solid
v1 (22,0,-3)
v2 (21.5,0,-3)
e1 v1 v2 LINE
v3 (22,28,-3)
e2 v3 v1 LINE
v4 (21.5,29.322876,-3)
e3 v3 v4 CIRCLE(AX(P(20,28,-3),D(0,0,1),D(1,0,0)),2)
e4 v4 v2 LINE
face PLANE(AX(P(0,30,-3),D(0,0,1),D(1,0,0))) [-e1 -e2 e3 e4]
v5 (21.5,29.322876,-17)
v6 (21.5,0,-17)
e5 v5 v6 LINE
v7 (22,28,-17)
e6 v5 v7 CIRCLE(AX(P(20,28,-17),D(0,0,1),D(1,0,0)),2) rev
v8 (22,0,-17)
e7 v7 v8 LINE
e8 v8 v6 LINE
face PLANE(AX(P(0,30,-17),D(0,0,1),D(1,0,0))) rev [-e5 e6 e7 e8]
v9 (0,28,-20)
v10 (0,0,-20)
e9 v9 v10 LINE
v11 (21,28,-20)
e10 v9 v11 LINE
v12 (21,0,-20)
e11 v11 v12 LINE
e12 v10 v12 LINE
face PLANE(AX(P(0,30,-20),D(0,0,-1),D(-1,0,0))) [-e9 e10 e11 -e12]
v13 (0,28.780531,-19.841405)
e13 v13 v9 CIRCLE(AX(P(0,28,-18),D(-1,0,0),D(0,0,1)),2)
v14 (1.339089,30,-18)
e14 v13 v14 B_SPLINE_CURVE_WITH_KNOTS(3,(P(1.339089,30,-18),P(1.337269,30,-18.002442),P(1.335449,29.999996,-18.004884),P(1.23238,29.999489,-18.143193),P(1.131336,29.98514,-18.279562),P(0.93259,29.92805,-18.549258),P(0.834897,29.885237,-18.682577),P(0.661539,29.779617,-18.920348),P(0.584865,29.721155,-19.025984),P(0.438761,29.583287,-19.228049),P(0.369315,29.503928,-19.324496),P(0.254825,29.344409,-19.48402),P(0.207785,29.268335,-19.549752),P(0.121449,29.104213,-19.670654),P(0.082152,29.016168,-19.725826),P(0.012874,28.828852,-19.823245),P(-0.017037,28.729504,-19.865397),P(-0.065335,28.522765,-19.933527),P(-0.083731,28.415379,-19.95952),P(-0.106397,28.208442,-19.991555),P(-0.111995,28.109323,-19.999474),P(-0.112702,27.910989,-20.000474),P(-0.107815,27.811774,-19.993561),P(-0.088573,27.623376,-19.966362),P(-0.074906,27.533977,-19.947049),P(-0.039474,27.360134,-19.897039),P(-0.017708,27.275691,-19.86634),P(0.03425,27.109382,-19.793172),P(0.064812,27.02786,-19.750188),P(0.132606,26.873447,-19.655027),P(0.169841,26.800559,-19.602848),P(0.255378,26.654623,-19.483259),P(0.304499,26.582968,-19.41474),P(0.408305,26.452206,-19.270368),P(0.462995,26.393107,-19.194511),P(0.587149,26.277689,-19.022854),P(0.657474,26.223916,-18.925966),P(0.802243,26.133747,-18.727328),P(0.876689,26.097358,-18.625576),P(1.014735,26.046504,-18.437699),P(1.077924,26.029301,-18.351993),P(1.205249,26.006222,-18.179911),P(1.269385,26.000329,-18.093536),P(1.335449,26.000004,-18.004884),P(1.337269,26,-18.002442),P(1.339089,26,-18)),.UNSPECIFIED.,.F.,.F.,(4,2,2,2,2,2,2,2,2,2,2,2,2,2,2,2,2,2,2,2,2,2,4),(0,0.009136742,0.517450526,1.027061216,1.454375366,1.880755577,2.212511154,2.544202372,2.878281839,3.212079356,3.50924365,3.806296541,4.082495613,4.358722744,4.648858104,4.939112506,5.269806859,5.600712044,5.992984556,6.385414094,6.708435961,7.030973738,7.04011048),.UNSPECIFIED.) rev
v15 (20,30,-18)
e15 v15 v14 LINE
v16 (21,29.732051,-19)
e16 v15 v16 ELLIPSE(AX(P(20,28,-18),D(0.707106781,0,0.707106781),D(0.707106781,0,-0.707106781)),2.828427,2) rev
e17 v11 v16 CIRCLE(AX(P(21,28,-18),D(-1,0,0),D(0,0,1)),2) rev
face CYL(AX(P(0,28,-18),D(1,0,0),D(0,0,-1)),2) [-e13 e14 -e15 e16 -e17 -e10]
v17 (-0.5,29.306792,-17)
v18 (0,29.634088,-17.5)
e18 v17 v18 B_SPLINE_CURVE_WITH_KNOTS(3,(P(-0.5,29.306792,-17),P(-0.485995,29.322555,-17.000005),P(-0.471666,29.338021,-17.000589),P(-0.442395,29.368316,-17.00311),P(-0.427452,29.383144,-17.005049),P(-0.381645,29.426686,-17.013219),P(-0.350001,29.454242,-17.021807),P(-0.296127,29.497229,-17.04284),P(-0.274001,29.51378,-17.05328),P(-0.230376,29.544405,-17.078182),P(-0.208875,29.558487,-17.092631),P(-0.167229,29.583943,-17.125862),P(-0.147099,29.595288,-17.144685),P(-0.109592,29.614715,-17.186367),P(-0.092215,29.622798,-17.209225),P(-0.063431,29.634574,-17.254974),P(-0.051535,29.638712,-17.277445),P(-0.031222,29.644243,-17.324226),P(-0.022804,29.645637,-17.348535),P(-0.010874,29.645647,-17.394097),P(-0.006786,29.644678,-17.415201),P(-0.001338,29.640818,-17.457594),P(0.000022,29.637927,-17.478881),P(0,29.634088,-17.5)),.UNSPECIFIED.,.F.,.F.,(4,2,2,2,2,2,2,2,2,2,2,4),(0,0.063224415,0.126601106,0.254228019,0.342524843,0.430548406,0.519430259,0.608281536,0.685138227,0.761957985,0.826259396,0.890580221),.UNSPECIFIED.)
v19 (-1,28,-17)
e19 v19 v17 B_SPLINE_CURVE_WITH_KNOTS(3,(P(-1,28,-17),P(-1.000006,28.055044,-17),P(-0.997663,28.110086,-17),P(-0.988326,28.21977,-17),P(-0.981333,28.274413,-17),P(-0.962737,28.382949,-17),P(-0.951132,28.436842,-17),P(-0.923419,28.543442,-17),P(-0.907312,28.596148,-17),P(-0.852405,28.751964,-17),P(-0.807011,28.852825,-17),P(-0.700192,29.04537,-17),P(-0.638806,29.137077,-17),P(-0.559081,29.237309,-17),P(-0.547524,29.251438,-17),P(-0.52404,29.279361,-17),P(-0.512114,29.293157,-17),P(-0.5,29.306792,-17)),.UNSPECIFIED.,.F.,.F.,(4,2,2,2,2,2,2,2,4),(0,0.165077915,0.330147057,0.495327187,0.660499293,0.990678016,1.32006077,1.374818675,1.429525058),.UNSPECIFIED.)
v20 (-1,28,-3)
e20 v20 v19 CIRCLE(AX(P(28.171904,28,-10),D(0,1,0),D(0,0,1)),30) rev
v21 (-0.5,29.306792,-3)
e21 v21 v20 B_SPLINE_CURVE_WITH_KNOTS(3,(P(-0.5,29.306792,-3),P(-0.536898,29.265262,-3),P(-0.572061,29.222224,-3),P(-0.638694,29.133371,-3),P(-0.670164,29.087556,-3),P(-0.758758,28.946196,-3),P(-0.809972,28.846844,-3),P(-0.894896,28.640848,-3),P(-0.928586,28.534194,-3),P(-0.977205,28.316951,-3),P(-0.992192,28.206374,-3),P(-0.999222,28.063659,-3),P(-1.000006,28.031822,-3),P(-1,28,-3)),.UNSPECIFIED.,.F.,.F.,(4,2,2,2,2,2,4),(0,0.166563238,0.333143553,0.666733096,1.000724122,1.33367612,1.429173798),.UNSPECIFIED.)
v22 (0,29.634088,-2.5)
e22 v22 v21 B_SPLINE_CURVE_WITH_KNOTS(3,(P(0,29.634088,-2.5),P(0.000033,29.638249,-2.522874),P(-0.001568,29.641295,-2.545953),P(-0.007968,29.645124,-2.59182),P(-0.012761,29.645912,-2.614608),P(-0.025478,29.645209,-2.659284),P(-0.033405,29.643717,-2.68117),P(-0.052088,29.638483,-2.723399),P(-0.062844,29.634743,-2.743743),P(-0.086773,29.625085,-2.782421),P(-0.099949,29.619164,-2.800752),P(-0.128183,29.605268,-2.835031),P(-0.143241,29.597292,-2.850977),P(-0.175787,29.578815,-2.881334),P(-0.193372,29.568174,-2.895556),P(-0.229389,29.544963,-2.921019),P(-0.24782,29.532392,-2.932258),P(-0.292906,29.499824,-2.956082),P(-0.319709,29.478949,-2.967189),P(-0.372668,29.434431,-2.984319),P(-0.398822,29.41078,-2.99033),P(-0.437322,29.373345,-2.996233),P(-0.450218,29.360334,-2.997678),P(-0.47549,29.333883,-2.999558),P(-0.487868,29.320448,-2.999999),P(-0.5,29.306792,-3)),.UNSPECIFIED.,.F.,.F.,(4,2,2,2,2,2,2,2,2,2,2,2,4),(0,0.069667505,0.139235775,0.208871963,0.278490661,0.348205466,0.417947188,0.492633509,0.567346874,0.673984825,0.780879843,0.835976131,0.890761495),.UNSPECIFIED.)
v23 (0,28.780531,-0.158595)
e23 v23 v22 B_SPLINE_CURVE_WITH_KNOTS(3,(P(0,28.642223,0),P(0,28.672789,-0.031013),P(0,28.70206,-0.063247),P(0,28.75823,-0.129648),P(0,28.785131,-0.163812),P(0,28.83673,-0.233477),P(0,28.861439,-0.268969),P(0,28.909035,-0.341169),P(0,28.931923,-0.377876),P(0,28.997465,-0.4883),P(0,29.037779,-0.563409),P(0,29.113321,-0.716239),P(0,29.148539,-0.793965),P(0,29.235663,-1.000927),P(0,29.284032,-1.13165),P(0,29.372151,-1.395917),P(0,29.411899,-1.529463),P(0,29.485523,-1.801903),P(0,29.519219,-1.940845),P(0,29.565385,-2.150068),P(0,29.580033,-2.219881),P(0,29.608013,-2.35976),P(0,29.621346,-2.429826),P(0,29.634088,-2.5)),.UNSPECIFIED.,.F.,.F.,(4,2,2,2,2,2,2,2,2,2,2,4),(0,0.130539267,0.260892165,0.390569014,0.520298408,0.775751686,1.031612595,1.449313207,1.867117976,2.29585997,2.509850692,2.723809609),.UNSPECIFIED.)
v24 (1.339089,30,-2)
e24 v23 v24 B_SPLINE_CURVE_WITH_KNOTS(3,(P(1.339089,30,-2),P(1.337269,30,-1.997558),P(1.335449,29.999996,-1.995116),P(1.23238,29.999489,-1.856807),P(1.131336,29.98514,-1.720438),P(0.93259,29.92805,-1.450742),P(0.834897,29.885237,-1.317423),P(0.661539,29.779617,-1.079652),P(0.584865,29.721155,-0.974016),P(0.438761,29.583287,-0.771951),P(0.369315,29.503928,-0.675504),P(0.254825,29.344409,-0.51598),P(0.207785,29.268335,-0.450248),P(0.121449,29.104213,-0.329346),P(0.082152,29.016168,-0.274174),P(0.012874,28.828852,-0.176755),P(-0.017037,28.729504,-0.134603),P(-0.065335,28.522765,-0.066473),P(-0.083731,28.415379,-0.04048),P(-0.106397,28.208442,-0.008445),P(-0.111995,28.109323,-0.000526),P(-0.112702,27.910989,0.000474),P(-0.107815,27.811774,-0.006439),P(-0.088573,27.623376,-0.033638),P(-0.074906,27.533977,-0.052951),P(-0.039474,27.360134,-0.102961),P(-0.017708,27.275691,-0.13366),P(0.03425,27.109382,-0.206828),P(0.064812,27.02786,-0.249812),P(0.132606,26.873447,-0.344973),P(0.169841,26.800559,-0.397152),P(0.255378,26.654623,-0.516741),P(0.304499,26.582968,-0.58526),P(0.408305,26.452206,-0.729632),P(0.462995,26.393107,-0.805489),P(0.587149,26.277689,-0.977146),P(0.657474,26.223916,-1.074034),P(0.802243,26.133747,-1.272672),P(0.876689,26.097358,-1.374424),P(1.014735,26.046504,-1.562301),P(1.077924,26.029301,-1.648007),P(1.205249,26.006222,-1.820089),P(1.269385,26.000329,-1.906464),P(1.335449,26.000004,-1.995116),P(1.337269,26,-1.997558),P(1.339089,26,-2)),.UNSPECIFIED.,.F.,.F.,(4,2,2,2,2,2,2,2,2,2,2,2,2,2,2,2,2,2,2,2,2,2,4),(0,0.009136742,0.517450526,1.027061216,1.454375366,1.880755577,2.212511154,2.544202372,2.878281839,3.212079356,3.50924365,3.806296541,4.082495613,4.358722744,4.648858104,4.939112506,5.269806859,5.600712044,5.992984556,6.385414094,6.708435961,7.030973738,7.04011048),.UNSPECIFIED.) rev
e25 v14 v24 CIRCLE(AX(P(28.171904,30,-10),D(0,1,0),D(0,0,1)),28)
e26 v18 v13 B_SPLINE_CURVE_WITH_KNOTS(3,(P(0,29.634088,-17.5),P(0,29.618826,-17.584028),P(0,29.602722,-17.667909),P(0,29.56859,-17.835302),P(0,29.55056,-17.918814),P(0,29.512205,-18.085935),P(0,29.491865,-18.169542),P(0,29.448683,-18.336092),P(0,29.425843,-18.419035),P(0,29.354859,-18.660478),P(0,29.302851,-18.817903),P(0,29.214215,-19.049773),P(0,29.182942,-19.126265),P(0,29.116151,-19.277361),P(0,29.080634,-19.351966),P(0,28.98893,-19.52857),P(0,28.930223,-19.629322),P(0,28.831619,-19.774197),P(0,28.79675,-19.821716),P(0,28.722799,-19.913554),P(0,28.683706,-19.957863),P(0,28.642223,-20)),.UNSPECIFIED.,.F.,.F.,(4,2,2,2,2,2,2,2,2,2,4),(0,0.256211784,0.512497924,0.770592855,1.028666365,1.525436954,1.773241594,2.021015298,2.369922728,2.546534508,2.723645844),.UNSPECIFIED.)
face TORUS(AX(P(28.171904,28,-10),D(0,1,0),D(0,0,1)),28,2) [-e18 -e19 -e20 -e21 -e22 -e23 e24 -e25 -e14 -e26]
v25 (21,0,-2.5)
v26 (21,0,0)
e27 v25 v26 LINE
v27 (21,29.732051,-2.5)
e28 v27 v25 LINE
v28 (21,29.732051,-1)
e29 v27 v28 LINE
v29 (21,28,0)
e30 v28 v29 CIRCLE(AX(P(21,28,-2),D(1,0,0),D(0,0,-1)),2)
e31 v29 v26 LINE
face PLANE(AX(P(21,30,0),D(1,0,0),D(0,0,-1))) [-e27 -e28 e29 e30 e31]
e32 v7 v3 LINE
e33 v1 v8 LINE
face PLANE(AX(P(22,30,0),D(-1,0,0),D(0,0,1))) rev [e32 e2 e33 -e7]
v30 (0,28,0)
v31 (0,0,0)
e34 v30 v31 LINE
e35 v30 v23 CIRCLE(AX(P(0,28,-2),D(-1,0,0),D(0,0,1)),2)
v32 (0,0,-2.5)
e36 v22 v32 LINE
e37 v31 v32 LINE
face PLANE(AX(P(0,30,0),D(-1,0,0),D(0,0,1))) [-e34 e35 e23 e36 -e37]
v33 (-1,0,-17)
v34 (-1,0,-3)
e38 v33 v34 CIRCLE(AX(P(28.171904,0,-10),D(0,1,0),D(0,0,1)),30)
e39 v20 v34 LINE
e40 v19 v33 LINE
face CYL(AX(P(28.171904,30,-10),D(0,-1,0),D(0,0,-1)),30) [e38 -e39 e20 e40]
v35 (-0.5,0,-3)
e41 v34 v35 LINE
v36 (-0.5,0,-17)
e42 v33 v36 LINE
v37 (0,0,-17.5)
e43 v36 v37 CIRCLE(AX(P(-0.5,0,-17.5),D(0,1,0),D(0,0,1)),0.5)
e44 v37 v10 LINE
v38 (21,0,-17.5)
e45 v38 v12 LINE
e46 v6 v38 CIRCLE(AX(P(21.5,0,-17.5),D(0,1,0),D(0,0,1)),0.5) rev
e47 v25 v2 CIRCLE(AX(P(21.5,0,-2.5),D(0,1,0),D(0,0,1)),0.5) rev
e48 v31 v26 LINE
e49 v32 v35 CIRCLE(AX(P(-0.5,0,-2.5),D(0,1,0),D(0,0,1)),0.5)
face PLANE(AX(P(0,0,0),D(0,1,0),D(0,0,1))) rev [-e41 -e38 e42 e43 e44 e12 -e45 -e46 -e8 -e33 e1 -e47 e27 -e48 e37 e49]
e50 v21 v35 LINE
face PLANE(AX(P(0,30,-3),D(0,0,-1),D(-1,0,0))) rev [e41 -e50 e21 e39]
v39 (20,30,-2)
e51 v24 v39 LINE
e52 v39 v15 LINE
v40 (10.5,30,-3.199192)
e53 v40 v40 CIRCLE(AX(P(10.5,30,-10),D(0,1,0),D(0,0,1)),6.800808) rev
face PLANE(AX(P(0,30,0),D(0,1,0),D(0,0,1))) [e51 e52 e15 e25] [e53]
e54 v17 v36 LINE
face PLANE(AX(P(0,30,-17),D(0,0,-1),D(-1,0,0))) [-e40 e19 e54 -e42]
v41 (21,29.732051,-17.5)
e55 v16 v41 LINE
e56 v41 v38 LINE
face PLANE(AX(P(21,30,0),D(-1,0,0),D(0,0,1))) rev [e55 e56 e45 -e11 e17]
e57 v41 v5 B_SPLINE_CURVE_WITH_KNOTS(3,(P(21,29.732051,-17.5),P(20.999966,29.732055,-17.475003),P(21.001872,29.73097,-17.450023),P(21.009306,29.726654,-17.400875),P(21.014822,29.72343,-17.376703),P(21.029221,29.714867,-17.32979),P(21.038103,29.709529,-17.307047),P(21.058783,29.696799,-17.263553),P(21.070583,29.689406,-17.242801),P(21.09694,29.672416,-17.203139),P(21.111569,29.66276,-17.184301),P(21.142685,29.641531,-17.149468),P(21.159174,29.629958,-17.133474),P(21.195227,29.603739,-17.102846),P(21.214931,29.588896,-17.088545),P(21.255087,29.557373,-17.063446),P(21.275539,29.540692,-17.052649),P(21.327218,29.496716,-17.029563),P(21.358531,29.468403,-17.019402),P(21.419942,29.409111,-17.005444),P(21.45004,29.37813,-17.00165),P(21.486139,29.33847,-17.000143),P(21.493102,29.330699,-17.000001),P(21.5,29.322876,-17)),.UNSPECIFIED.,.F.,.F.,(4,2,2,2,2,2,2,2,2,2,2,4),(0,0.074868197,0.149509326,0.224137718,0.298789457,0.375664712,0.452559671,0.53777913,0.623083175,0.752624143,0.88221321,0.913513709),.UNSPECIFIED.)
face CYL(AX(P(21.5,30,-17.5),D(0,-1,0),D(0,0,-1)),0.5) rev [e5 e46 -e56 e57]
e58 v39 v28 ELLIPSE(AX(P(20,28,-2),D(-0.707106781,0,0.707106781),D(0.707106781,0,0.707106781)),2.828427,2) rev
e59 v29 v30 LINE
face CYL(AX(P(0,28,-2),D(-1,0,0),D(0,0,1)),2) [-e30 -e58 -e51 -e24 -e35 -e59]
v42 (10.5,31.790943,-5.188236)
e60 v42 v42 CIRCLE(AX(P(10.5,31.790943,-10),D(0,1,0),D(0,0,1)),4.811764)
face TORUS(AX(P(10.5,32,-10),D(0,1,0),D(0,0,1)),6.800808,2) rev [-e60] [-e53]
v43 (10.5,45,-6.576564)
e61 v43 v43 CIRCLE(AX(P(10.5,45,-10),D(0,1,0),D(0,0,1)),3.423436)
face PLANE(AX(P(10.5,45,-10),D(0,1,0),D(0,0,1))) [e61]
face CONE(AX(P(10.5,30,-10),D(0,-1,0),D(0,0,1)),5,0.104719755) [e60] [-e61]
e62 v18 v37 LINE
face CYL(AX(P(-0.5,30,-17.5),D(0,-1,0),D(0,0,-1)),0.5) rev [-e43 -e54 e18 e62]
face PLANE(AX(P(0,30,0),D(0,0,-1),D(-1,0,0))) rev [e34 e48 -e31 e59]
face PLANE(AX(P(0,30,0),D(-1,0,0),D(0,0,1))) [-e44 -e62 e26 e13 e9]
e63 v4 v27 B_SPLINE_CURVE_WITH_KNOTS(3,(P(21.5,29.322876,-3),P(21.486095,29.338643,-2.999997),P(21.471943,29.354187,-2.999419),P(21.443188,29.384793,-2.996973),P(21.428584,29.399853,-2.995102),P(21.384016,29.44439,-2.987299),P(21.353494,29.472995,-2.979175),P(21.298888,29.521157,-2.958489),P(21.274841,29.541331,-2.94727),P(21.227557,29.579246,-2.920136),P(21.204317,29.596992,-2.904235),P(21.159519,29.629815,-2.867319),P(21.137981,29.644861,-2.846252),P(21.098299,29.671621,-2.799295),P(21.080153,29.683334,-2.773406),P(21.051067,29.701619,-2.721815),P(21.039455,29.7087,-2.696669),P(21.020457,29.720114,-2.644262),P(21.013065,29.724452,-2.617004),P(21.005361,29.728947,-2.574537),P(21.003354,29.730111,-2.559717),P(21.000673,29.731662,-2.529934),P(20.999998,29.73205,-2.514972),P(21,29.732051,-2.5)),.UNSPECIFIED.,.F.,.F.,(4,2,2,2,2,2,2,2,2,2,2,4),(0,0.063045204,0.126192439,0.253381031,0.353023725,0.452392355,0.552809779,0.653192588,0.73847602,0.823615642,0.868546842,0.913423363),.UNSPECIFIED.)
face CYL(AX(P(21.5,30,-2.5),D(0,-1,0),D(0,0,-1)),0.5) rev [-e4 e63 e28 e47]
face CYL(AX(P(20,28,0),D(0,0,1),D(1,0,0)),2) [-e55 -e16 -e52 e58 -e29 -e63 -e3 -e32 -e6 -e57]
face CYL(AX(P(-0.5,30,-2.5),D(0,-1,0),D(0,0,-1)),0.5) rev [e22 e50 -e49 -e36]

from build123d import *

# Parameters (mm, degrees)
SALIENTE_EXTRUIR1_DEPTH = 30
CROQUIS2_R              = 5
SALIENTE_EXTRUIR2_DEPTH = 15
SALIENTE_EXTRUIR2_TAPER = 6
REDONDEO1_R             = 2
REDONDEO2_R             = 2


with BuildPart() as part:
    # Croquis1 → Saliente-Extruir1 (new body)
    with BuildSketch(Plane(origin=(0, 0, 0), x_dir=(1, 0, 0), z_dir=(0, 1, 0))):
        with BuildLine():
            Line((0, 2.5), (0, 0))
            Line((0, 0), (10.5, 0))
            Line((10.5, 0), (10.5, 20))
            Line((10.5, 20), (0, 20))
            Line((0, 20), (0, 17.5))
            ThreePointArc((0, 17.5), (-0.146446609, 17.146446609), (-0.5, 17))
            Line((-0.5, 17), (-1, 17))
            ThreePointArc((-1, 17), (-1.828095708, 10), (-1, 3))
            Line((-1, 3), (-0.5, 3))
            ThreePointArc((-0.5, 3), (-0.146446609, 2.853553391), (0, 2.5))
        make_face()
        with BuildLine():
            Line((10.5, 20), (10.5, 0))
            Line((10.5, 0), (21, 0))
            Line((21, 0), (21, 2.5))
            ThreePointArc((21, 2.5), (21.146446609, 2.853553391), (21.5, 3))
            Line((21.5, 3), (22, 3))
            Line((22, 3), (22, 17))
            Line((22, 17), (21.5, 17))
            ThreePointArc((21.5, 17), (21.146446609, 17.146446609), (21, 17.5))
            Line((21, 17.5), (21, 20))
            Line((21, 20), (10.5, 20))
        make_face()
    extrude(amount=SALIENTE_EXTRUIR1_DEPTH)

    # Croquis2 → Saliente-Extruir2 (add)
    with BuildSketch(Plane(origin=(0, 30, 0), x_dir=(1, 0, 0), z_dir=(0, 1, 0))):
        with Locations((10.5, 10)):
            Circle(CROQUIS2_R)
    extrude(amount=SALIENTE_EXTRUIR2_DEPTH, taper=SALIENTE_EXTRUIR2_TAPER)

    # Redondeo1
    # the kernel refuses this fillet: 2 mm, written as the material it takes off along each edge
    with BuildSketch(Plane(origin=(26, 30, -20), x_dir=(0, 0, 1), z_dir=(-1, 0, 0)), Plane(origin=(-5, 30, 0), x_dir=(0, 0, -1), z_dir=(1, 0, 0))) as redondeo1_piece_1:
        with BuildLine():
            CenterArc((REDONDEO1_R, -REDONDEO1_R), REDONDEO1_R, 90, 90)
            Line((0, -REDONDEO1_R), (0, 0))
            Line((0, 0), (REDONDEO1_R, 0))
        make_face()
    extrude(amount=31, mode=Mode.SUBTRACT)
    with BuildSketch(Plane(origin=(22, 30, 2), x_dir=(-1, 0, 0), z_dir=(0, 0, -1))) as redondeo1_piece_2:
        with BuildLine():
            CenterArc((REDONDEO1_R, -REDONDEO1_R), REDONDEO1_R, 90, 90)
            Line((0, -REDONDEO1_R), (0, 0))
            Line((0, 0), (REDONDEO1_R, 0))
        make_face()
    extrude(amount=24, mode=Mode.SUBTRACT)
    with BuildSketch(Plane(origin=(28.171904292, 30, -10), x_dir=(-0.92021107903263, 0, -0.391422495553849), z_dir=(0.391422495553849, 0, -0.92021107903263))) as redondeo1_piece_3:
        with BuildLine():
            CenterArc((30 - REDONDEO1_R, -REDONDEO1_R), REDONDEO1_R, 0, 90)
            Line((30 - REDONDEO1_R, 0), (30, 0))
            Line((30, 0), (30, -REDONDEO1_R))
        make_face()
    revolve(axis=Axis((28.171904292, 30, -10), (0, 1, 0)), revolution_arc=46.086080448, mode=Mode.SUBTRACT)

    # Redondeo2
    redondeo2_edges = [part.edges().sort_by_distance(p)[0] for p in [
        (5.5, 30, -10),
    ]]
    fillet(redondeo2_edges, radius=REDONDEO2_R)


solid = part.part
